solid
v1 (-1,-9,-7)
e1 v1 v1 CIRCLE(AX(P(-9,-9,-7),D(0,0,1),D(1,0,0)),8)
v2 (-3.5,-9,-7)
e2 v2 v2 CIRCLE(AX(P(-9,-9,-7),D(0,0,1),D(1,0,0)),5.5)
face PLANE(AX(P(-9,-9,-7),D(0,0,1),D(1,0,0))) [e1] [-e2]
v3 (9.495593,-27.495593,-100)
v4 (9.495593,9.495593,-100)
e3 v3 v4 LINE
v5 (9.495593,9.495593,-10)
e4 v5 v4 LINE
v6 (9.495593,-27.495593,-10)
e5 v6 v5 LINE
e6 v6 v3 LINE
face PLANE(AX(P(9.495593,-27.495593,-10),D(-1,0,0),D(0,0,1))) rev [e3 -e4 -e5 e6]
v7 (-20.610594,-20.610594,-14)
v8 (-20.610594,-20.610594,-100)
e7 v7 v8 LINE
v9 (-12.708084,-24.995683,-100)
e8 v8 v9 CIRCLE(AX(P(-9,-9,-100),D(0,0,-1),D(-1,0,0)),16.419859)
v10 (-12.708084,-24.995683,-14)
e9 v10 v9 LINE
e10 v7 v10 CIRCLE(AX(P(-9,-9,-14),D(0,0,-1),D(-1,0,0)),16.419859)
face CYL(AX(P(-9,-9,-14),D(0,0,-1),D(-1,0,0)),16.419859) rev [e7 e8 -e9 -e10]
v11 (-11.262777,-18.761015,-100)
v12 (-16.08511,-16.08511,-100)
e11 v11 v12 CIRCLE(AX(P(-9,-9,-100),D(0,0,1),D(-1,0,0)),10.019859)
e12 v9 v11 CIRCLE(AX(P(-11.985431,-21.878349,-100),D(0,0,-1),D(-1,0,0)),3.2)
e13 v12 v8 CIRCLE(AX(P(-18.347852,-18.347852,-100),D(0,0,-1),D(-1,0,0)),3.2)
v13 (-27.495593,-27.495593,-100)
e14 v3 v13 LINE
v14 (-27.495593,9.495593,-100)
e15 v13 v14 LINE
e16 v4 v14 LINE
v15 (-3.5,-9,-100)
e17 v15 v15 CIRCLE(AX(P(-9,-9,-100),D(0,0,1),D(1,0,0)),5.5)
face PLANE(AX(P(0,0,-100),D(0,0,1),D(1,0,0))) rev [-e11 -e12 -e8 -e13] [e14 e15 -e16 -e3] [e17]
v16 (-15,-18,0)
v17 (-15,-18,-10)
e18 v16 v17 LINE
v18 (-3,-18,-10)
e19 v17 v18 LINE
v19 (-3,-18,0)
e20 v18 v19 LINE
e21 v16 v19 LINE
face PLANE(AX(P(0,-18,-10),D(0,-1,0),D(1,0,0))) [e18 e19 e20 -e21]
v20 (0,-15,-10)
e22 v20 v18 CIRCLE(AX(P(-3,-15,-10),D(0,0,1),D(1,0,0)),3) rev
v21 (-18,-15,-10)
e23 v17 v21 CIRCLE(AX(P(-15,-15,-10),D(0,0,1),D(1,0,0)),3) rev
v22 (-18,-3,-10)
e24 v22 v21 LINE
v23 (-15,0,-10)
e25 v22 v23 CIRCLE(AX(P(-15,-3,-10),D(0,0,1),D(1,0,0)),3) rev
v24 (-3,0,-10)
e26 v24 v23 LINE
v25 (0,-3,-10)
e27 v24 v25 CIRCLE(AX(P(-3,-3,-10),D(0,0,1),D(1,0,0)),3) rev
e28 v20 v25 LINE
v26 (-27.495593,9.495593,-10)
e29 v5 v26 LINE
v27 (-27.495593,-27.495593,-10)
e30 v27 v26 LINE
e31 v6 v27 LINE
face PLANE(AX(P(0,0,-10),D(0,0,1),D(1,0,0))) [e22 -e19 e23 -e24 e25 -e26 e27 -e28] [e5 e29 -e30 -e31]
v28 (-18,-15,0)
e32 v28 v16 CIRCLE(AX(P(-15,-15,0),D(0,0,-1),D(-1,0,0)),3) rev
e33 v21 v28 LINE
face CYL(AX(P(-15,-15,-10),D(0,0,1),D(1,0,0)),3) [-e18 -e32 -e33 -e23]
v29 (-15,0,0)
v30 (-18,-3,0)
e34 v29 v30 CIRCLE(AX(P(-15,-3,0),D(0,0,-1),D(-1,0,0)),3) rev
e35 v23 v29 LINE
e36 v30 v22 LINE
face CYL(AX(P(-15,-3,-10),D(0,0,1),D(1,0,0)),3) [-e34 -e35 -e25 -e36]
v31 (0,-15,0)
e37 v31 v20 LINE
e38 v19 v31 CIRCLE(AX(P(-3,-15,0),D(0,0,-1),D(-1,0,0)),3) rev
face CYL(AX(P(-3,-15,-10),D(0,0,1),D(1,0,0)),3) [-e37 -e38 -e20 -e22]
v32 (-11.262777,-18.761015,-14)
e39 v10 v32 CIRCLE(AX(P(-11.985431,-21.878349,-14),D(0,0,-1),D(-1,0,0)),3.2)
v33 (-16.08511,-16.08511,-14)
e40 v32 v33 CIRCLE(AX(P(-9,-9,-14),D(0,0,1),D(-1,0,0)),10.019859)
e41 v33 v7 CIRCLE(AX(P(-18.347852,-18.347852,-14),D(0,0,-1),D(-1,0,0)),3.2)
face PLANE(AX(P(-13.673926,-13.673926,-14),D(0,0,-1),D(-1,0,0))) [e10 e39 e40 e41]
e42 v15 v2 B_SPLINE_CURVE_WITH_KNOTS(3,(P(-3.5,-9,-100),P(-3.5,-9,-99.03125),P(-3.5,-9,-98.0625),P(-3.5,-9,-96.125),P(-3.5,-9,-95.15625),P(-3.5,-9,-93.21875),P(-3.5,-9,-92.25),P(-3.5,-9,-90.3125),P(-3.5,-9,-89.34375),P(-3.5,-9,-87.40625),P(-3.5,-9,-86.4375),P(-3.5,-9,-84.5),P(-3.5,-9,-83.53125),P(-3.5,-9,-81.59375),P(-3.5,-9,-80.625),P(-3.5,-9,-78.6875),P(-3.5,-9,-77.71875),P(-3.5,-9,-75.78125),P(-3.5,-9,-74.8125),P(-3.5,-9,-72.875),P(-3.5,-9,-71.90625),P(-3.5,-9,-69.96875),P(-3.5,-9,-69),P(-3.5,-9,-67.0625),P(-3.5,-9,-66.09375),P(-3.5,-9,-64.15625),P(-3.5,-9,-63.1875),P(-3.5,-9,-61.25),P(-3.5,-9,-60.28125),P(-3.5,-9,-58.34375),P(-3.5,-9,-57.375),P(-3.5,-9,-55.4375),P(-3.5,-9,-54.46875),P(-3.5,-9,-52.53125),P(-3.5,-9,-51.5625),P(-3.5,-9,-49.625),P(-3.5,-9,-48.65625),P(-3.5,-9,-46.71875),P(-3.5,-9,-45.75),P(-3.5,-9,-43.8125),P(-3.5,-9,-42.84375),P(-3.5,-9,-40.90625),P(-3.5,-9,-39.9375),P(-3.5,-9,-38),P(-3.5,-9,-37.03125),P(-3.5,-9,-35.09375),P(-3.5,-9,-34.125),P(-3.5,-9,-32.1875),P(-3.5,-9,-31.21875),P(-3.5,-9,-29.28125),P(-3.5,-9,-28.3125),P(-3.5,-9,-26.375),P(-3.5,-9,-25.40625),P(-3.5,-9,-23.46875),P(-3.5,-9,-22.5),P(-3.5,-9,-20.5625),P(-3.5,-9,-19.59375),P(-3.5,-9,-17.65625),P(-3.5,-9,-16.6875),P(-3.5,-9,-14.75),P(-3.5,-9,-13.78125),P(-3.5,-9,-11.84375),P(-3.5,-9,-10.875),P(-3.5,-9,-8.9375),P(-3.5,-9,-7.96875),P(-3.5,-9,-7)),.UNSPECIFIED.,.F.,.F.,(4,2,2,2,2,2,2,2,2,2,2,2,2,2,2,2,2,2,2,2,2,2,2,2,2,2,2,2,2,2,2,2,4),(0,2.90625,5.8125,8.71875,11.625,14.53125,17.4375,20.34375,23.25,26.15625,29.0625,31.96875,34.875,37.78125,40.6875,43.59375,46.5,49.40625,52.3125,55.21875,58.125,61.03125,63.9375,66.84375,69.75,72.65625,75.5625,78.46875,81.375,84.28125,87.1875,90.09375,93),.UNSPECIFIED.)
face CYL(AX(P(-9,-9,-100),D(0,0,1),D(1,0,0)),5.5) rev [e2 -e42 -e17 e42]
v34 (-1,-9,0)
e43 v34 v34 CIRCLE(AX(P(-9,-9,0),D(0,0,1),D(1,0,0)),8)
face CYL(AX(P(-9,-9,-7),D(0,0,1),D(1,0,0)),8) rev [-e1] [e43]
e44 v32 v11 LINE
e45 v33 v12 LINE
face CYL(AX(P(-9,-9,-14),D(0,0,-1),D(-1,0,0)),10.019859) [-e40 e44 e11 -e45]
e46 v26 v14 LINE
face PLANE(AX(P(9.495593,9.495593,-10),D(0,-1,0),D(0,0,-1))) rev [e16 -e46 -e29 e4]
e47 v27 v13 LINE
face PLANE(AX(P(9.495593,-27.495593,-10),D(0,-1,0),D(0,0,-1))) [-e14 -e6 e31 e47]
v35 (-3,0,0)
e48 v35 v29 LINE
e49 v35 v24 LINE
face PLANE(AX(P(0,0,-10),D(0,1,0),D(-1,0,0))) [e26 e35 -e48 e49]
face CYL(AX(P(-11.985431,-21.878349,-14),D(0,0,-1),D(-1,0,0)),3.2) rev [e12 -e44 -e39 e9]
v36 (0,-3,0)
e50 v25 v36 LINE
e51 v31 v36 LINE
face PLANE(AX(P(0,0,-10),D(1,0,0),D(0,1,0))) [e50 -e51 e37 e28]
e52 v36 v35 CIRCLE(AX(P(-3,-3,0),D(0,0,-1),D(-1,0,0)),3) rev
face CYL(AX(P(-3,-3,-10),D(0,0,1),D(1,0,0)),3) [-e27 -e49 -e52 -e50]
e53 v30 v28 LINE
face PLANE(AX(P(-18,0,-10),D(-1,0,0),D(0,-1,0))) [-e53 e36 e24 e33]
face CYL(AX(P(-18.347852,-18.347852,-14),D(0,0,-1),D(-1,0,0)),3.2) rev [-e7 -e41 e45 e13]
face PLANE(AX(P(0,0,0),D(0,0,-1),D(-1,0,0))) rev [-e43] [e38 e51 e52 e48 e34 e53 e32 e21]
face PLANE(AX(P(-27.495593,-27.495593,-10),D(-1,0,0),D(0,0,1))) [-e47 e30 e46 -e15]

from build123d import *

# Parameters (mm, degrees)
SKETCH_1_W              = 18
SKETCH_1_H              = 18
EXTRUDE_2_DEPTH         = 10
EXTRUDE_3_DEPTH         = 90
CUT_EXTRUDE_3_DEPTH     = 86
CUT_EXTRUDE_START       = -100
CUT_EXTRUDE_5_OUTLINE_R = 5.5
CUT_EXTRUDE_5_DEPTH     = 93
SKETCH_7_R              = 8
CUT_EXTRUDE_6_DEPTH     = 7
FILLET_6_R              = 3
FILLET_7_R              = 3
FILLET_8_R              = 3
FILLET_9_R              = 3


# Read off the part's stored shape, not the designer's step: 切除-拉伸5
with BuildPart() as part:
    # 草图1 → 凸台-拉伸2 (new body)
    with BuildSketch(Plane.XY):
        with Locations((-9, -9)):
            Rectangle(SKETCH_1_W, SKETCH_1_H)
    extrude(amount=-EXTRUDE_2_DEPTH)

    # Sketch 3D_1 → 凸台-拉伸3 (add)
    with BuildSketch(Plane(origin=(9.495592889, -27.495592889, -10), x_dir=(-0.7071067811865476, 0.7071067811865476, -9.817405728081993e-13), z_dir=(-1.3883908327972863e-12, 0, 1.0))):
        Polygon((0, 0), (26.156718308, 26.156718308), (52.313436617, 0), (26.156718308, -26.156718308), align=None)
    extrude(amount=-EXTRUDE_3_DEPTH)

    # 草图6 → 切除-拉伸3 (cut)
    with BuildSketch(Plane(origin=(0, 0, -100), x_dir=(-1.0, 0, -1.3537169902663766e-12), z_dir=(1.3537169902663766e-12, -3.467772761410138e-14, -1.0))):
        with BuildLine():
            ThreePointArc((20.610593598, -20.610593598), (1.033022784, 5.357543015), (12.708084345, -24.995683102))
            ThreePointArc((12.708084345, -24.995683102), (15.102764846, -21.155695433), (11.262777177, -18.761014932))
            ThreePointArc((11.262777177, -18.761014932), (4.138326818, -0.238624142), (16.085110199, -16.085110199))
            ThreePointArc((16.085110199, -16.085110199), (16.085110199, -20.610593598), (20.610593598, -20.610593598))
        make_face()
    extrude(amount=-CUT_EXTRUDE_3_DEPTH, mode=Mode.SUBTRACT)

    # 切除-拉伸5 outline → 切除-拉伸5 (cut)
    with BuildSketch(Plane.XY.offset(CUT_EXTRUDE_START)):
        with Locations((-9, -9)):
            Circle(CUT_EXTRUDE_5_OUTLINE_R)
    extrude(amount=CUT_EXTRUDE_5_DEPTH, mode=Mode.SUBTRACT)

    # 草图7 → 切除-拉伸6 (cut)
    with BuildSketch(Plane.XY):
        with Locations((-9, -9)):
            Circle(SKETCH_7_R)
    extrude(amount=-CUT_EXTRUDE_6_DEPTH, mode=Mode.SUBTRACT)

    # 圆角6
    fillet_6_edges = [part.edges().sort_by_distance(p)[0] for p in [
        (-18, 0, -5),
    ]]
    fillet(fillet_6_edges, radius=FILLET_6_R)

    # 圆角7
    fillet_7_edges = [part.edges().sort_by_distance(p)[0] for p in [
        (-18, -18, -5),
    ]]
    fillet(fillet_7_edges, radius=FILLET_7_R)

    # 圆角8
    fillet_8_edges = [part.edges().sort_by_distance(p)[0] for p in [
        (0, 0, -5),
    ]]
    fillet(fillet_8_edges, radius=FILLET_8_R)

    # 圆角9
    fillet_9_edges = [part.edges().sort_by_distance(p)[0] for p in [
        (0, -18, -5),
    ]]
    fillet(fillet_9_edges, radius=FILLET_9_R)


solid = part.part
